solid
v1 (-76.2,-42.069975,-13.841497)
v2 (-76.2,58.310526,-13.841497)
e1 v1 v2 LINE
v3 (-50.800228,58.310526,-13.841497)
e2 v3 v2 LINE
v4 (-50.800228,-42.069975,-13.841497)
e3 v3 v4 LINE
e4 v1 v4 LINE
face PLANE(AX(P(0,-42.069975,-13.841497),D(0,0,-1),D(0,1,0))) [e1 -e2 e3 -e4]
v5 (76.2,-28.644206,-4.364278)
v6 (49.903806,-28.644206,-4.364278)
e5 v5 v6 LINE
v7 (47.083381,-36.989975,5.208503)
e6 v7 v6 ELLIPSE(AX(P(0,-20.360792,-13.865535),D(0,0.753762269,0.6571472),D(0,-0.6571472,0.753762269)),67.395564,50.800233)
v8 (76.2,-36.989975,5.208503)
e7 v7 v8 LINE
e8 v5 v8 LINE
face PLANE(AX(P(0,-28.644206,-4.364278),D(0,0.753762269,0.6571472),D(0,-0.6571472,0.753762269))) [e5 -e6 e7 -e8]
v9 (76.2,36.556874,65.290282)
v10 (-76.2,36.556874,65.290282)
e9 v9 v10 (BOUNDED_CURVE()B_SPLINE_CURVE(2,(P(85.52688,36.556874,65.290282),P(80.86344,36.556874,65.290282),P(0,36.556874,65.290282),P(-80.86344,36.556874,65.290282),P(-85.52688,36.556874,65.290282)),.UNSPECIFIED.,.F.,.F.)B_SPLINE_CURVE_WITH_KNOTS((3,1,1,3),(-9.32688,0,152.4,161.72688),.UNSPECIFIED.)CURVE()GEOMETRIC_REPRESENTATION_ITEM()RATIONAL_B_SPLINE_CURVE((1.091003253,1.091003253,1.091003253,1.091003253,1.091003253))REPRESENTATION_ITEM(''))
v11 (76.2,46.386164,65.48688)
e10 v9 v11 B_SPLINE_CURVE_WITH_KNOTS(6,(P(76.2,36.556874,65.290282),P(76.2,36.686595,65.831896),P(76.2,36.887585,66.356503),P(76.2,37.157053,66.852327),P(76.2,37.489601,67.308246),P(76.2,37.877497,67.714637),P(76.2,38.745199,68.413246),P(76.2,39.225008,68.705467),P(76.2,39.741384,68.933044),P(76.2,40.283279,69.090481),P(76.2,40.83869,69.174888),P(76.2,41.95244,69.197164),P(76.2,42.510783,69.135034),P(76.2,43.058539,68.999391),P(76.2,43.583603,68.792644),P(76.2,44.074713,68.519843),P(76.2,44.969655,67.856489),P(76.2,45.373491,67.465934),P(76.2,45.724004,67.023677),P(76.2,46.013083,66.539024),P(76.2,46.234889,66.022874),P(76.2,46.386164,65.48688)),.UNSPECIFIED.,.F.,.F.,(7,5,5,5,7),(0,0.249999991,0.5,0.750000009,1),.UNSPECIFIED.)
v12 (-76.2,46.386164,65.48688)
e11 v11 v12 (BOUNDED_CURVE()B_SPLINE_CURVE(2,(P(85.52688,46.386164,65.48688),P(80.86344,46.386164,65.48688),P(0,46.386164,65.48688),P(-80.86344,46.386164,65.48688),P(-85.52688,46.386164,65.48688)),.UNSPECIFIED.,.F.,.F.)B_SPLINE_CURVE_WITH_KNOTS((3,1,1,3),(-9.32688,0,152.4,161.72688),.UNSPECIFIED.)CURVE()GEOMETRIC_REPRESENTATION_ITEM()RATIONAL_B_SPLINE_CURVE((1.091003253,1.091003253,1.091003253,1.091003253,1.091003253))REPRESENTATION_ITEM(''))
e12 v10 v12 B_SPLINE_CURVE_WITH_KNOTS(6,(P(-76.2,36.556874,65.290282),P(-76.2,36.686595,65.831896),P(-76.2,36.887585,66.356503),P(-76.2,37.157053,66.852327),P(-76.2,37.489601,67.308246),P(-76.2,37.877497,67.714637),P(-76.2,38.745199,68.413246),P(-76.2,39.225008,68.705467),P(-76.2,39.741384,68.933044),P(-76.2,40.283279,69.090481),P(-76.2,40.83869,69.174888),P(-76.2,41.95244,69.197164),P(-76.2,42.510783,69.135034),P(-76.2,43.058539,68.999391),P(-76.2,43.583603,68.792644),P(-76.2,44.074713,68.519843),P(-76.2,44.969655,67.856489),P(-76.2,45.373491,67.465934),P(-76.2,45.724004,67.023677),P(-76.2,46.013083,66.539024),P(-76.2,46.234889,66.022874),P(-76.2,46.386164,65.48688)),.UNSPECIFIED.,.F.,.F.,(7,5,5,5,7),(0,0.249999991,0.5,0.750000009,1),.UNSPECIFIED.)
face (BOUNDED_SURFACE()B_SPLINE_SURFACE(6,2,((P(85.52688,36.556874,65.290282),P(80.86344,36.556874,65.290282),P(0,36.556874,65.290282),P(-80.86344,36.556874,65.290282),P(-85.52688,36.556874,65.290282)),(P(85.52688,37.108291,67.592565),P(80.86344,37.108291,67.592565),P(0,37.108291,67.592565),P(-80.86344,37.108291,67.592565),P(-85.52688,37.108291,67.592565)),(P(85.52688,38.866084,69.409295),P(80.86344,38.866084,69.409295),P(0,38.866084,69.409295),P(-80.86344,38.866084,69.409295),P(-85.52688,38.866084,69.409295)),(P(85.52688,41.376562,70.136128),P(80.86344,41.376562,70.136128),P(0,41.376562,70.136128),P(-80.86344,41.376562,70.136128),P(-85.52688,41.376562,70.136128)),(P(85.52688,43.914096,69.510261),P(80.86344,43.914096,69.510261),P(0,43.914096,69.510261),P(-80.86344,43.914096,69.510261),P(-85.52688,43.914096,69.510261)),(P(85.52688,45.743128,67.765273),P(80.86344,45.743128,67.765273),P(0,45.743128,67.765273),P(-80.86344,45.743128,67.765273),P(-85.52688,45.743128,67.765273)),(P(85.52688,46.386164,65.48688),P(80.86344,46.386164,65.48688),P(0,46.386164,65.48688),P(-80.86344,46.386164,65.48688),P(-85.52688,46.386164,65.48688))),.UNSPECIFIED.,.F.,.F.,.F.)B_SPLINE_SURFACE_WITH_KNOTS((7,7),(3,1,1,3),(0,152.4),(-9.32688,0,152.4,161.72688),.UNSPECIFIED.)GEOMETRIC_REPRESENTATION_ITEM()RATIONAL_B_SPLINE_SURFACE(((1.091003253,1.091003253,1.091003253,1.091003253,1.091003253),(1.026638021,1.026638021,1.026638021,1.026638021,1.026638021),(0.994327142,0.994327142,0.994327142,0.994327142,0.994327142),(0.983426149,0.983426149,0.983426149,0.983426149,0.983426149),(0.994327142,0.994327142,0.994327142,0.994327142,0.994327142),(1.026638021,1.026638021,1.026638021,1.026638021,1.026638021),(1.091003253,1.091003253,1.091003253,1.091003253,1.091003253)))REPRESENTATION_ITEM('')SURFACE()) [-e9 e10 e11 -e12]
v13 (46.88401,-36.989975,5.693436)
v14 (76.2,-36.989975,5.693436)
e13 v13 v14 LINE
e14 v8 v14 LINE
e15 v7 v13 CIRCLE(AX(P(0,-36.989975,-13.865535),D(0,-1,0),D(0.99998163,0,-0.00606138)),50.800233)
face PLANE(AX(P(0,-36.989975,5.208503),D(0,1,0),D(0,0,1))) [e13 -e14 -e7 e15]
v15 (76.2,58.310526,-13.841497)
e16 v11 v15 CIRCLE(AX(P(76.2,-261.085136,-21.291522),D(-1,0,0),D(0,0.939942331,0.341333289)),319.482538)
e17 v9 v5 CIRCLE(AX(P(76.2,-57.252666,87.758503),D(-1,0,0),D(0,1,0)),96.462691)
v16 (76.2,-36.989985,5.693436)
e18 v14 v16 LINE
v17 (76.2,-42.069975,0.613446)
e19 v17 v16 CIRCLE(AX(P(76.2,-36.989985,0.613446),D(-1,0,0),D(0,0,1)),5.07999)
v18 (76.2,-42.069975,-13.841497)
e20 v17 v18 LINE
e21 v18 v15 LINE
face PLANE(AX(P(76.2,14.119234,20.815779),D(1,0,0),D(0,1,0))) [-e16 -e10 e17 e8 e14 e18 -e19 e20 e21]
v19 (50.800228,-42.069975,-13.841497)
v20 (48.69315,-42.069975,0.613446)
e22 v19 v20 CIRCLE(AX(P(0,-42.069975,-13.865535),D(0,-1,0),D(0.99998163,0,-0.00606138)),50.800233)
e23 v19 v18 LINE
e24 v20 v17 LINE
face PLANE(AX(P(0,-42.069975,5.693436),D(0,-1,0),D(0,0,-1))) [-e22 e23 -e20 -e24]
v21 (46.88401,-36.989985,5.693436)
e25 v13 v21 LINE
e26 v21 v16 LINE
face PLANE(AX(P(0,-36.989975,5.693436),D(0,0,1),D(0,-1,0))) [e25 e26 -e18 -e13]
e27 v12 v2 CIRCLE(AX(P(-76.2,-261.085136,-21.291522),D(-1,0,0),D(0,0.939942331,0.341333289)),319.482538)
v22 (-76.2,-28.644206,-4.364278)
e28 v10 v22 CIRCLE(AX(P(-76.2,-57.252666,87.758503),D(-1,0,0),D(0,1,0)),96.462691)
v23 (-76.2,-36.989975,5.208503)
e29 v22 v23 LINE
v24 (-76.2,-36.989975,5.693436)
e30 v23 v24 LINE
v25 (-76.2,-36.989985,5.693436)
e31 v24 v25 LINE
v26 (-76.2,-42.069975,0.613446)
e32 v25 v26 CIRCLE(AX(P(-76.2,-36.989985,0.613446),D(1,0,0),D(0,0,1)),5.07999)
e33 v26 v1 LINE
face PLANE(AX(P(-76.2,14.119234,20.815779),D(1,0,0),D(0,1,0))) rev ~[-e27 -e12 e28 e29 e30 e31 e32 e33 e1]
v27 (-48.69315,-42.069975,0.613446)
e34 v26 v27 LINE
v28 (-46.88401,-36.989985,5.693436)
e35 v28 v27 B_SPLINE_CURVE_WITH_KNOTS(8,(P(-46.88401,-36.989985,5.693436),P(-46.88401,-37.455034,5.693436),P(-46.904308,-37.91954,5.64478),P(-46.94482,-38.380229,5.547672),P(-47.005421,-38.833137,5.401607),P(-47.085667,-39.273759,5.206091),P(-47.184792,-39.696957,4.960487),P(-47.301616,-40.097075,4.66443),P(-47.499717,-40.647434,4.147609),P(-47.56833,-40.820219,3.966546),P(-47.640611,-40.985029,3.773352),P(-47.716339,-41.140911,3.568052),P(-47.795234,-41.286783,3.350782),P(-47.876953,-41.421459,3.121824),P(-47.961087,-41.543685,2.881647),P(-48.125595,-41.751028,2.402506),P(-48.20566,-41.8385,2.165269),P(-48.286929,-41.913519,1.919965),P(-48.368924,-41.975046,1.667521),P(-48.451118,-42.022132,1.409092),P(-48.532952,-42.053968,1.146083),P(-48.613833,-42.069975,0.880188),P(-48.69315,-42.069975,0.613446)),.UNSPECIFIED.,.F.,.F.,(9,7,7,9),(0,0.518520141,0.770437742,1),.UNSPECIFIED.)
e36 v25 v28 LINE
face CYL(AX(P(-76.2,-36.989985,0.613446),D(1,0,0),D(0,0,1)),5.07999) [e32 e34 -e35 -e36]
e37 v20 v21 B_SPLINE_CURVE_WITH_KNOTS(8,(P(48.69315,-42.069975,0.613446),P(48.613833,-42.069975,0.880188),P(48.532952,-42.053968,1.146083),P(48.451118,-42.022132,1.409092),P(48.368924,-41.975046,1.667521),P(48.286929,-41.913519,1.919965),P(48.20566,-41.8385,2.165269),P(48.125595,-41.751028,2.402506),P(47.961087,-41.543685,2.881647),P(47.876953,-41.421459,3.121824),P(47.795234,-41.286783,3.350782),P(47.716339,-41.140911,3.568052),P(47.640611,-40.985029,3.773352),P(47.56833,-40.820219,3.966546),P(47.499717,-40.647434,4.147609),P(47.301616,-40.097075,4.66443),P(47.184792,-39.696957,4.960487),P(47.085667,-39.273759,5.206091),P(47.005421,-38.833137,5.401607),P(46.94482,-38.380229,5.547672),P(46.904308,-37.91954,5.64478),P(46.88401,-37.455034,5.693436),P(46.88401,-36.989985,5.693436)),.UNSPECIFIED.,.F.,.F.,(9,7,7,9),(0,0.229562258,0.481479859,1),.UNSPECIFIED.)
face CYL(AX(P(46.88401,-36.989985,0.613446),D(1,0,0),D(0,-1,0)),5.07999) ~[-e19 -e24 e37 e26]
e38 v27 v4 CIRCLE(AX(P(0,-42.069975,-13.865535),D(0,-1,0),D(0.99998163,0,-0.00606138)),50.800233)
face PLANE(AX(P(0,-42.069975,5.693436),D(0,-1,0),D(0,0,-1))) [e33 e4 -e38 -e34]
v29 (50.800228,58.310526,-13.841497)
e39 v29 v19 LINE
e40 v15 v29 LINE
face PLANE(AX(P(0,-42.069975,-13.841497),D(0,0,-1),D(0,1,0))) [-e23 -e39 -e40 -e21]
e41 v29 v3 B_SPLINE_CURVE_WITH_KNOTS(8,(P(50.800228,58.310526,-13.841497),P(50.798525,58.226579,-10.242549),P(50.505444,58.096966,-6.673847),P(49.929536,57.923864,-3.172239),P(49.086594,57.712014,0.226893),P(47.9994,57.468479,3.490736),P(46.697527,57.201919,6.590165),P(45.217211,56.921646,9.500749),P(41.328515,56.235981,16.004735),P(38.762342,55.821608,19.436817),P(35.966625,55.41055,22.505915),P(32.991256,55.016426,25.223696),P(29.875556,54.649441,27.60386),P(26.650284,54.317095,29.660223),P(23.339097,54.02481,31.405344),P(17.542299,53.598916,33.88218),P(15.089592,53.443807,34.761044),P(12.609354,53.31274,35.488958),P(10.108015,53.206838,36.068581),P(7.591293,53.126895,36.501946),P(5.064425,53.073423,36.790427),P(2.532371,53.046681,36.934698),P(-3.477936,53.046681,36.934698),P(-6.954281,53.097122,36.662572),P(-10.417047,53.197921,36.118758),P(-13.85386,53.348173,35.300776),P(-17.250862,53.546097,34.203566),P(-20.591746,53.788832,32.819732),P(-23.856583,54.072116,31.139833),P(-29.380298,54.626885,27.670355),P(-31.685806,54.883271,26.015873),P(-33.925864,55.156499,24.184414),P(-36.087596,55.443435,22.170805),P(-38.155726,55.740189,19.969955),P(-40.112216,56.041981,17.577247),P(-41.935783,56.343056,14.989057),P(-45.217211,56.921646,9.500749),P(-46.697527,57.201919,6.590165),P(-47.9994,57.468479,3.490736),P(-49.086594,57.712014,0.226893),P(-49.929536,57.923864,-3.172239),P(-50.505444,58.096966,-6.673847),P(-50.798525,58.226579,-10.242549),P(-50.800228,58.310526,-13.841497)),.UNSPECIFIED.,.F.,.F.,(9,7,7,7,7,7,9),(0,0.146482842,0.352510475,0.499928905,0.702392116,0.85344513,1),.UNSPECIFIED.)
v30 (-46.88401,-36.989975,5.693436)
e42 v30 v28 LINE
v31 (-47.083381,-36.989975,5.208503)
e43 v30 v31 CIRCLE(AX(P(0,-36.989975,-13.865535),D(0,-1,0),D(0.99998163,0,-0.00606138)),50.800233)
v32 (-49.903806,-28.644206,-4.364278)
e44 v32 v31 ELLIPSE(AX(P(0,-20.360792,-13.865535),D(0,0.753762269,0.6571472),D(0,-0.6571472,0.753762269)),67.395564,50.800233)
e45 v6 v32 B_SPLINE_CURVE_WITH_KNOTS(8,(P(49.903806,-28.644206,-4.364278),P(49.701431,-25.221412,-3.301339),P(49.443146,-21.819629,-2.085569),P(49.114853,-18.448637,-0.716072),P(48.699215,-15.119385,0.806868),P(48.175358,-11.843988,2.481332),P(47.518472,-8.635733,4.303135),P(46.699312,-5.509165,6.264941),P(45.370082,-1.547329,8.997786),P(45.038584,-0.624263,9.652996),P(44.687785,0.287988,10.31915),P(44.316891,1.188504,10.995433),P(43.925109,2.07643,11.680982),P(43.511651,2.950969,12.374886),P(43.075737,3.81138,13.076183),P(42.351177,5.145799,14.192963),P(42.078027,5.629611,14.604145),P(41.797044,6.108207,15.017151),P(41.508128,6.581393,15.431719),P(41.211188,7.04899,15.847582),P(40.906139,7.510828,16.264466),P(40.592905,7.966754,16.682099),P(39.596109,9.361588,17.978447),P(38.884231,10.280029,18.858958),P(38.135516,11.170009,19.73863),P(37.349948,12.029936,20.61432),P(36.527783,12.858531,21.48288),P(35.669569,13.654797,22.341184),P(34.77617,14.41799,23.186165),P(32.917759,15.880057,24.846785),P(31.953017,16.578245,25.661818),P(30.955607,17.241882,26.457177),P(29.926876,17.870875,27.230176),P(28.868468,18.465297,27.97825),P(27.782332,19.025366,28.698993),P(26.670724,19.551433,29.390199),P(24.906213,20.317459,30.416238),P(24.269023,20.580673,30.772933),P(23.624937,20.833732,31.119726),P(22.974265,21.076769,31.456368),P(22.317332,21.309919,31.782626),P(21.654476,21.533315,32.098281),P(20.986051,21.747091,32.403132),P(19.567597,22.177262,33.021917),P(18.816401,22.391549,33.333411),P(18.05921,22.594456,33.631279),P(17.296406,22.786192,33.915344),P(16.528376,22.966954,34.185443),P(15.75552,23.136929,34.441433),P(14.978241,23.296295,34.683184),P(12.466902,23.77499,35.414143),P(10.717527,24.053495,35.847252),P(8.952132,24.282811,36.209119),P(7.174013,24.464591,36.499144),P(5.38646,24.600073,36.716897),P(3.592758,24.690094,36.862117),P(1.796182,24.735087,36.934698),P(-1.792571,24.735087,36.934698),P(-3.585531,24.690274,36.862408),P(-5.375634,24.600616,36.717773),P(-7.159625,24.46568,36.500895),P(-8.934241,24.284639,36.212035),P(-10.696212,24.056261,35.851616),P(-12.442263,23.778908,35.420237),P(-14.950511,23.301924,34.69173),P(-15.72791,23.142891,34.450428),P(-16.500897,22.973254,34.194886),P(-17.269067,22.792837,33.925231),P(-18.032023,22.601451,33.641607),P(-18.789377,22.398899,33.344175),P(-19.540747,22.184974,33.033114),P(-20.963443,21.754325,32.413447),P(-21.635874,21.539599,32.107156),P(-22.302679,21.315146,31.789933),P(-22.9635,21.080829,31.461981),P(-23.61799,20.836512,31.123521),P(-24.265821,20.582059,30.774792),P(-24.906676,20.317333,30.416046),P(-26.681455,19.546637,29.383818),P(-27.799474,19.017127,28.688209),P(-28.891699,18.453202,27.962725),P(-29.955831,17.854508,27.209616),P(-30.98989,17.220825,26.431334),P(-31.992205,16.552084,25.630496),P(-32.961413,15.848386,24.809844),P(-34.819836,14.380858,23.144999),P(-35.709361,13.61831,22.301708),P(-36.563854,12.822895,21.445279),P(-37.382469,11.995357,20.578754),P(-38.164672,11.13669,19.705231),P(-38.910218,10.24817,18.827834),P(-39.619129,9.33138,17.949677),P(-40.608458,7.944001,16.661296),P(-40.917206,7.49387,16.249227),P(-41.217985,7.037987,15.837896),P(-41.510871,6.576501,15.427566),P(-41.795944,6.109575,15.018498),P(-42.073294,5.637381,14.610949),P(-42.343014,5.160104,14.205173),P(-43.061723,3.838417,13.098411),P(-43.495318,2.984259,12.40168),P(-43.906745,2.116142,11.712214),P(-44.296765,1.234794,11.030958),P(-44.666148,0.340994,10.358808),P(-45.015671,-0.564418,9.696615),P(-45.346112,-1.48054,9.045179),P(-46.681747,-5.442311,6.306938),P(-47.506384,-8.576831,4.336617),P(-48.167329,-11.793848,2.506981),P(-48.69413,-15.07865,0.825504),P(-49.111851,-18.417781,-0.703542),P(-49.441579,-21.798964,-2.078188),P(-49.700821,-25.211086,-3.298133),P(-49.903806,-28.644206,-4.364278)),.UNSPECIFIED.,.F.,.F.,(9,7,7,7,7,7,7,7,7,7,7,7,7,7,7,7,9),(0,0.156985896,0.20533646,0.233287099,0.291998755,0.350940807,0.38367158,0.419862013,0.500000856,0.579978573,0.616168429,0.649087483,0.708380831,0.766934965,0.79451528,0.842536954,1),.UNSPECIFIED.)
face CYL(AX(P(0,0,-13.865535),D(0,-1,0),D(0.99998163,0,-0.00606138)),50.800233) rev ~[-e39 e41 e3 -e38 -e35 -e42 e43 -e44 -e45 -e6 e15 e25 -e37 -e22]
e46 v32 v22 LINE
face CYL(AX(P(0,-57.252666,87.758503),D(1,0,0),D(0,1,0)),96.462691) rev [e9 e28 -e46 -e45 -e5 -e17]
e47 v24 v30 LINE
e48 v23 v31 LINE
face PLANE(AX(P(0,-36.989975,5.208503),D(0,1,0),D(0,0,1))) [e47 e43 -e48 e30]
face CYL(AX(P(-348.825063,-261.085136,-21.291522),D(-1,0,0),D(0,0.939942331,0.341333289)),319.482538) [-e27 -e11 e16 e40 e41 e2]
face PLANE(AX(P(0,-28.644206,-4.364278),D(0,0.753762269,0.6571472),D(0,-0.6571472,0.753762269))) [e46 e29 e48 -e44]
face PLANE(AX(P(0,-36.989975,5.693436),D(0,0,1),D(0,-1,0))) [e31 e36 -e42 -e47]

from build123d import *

# Parameters (mm, degrees)
F0_W        = 19.1873764305
F0_H        = 101.6
F1_DEPTH    = 76.2
F3_DEPTH    = 67.31
F4_T1_DEPTH = 697.6501262753
F5_R        = 5.07999
F6_R        = 5.08


# Not quite as in the source:
# - a fillet or chamfer that OpenCascade refuses, or shapes differently, is made with other operations: its cross-section is extruded or revolved along the edge and cut away or added
# - a fillet or chamfer is up to 0.001 mm smaller than in the source, because OpenCascade refuses the exact size


with BuildPart() as f1:
    # F0 (on Right) → F1 (new body, symmetric)
    with BuildSketch(Plane.YZ):
        with BuildLine():
            Line((-28.6442058678, -4.364277937), (-36.9899753063, 5.2085028753))
            Line((-36.9899753063, 5.2085028753), (-36.9899753063, -13.8414971247))
            Line((-36.9899753063, -13.8414971247), (39.2100246937, -13.8414971247))
            Line((39.2100246937, -13.8414971247), (39.2100246937, 87.7585028753))
            ThreePointArc((39.2100246937, 87.7585028753), (20.4155377225, 30.5509785676), (-28.6442058678, -4.364277937))
        make_face()
        Polygon((-36.9899753063, -13.8414971247), (-36.9899753063, 5.2085028753), (-36.9899753063, 5.6934356689), (-42.0699753063, 5.6934356689), (-42.0699753063, -13.8414971247), align=None)
        with Locations((48.803712909, 36.9585028753)):
            Rectangle(F0_W, F0_H)
    extrude(amount=F1_DEPTH, both=True)

    # F2 (on Front) → F3 (cut, symmetric)
    with BuildSketch(Plane.XZ):
        with BuildLine():
            ThreePointArc((50.7993000876, -14.1734545694), (0.1539604747, 36.9344649658), (-50.8002333049, -13.8655350342))
            Line((-50.8002333049, -13.8655350342), (50.7993000876, -14.1734545694))
        make_face()
    extrude(amount=F3_DEPTH, both=True, mode=Mode.SUBTRACT)

    # F4: fillet of radius 319.4825375631 on 1 edges, made by hand

    # F4_s2 → F4_t1 (cut)
    with BuildSketch(Plane.YZ.offset(-348.8250631377)):
        with BuildLine():
            ThreePointArc((39.2100246937, 87.7585028753), (53.5639950587, 34.0710629609), (58.3974011242, -21.2915223798))
            Line((58.3974011242, -21.2915223798), (64.7870518755, -21.2915223798))
            Line((64.7870518755, -21.2915223798), (64.7870518755, 87.7585028753))
            Line((64.7870518755, 87.7585028753), (58.3974011242, 94.1481536266))
            ThreePointArc((58.3974011242, 94.1481536266), (48.803712909, 94.1481536266), (45.2159279163, 89.9395033804))
            Line((45.2159279163, 89.9395033804), (39.2100246937, 87.7585028753))
        make_face()
    extrude(amount=F4_T1_DEPTH, mode=Mode.SUBTRACT)

    # F5 (radius 5.08 in the source; OpenCascade refuses exactly that, so slightly less here)
    f5_edges = [f1.edges().sort_by_distance(p)[0] for p in [
        (-61.542005, -42.069975, 5.693436),
        (61.542005, -42.069975, 5.693436),
    ]]
    fillet(f5_edges, radius=F5_R)

    # F6
    f6_edges = [f1.edges().sort_by_distance(p)[0] for p in [
        (0, 39.210025, 87.758503),
    ]]
    fillet(f6_edges, radius=F6_R)


solid = f1.part
